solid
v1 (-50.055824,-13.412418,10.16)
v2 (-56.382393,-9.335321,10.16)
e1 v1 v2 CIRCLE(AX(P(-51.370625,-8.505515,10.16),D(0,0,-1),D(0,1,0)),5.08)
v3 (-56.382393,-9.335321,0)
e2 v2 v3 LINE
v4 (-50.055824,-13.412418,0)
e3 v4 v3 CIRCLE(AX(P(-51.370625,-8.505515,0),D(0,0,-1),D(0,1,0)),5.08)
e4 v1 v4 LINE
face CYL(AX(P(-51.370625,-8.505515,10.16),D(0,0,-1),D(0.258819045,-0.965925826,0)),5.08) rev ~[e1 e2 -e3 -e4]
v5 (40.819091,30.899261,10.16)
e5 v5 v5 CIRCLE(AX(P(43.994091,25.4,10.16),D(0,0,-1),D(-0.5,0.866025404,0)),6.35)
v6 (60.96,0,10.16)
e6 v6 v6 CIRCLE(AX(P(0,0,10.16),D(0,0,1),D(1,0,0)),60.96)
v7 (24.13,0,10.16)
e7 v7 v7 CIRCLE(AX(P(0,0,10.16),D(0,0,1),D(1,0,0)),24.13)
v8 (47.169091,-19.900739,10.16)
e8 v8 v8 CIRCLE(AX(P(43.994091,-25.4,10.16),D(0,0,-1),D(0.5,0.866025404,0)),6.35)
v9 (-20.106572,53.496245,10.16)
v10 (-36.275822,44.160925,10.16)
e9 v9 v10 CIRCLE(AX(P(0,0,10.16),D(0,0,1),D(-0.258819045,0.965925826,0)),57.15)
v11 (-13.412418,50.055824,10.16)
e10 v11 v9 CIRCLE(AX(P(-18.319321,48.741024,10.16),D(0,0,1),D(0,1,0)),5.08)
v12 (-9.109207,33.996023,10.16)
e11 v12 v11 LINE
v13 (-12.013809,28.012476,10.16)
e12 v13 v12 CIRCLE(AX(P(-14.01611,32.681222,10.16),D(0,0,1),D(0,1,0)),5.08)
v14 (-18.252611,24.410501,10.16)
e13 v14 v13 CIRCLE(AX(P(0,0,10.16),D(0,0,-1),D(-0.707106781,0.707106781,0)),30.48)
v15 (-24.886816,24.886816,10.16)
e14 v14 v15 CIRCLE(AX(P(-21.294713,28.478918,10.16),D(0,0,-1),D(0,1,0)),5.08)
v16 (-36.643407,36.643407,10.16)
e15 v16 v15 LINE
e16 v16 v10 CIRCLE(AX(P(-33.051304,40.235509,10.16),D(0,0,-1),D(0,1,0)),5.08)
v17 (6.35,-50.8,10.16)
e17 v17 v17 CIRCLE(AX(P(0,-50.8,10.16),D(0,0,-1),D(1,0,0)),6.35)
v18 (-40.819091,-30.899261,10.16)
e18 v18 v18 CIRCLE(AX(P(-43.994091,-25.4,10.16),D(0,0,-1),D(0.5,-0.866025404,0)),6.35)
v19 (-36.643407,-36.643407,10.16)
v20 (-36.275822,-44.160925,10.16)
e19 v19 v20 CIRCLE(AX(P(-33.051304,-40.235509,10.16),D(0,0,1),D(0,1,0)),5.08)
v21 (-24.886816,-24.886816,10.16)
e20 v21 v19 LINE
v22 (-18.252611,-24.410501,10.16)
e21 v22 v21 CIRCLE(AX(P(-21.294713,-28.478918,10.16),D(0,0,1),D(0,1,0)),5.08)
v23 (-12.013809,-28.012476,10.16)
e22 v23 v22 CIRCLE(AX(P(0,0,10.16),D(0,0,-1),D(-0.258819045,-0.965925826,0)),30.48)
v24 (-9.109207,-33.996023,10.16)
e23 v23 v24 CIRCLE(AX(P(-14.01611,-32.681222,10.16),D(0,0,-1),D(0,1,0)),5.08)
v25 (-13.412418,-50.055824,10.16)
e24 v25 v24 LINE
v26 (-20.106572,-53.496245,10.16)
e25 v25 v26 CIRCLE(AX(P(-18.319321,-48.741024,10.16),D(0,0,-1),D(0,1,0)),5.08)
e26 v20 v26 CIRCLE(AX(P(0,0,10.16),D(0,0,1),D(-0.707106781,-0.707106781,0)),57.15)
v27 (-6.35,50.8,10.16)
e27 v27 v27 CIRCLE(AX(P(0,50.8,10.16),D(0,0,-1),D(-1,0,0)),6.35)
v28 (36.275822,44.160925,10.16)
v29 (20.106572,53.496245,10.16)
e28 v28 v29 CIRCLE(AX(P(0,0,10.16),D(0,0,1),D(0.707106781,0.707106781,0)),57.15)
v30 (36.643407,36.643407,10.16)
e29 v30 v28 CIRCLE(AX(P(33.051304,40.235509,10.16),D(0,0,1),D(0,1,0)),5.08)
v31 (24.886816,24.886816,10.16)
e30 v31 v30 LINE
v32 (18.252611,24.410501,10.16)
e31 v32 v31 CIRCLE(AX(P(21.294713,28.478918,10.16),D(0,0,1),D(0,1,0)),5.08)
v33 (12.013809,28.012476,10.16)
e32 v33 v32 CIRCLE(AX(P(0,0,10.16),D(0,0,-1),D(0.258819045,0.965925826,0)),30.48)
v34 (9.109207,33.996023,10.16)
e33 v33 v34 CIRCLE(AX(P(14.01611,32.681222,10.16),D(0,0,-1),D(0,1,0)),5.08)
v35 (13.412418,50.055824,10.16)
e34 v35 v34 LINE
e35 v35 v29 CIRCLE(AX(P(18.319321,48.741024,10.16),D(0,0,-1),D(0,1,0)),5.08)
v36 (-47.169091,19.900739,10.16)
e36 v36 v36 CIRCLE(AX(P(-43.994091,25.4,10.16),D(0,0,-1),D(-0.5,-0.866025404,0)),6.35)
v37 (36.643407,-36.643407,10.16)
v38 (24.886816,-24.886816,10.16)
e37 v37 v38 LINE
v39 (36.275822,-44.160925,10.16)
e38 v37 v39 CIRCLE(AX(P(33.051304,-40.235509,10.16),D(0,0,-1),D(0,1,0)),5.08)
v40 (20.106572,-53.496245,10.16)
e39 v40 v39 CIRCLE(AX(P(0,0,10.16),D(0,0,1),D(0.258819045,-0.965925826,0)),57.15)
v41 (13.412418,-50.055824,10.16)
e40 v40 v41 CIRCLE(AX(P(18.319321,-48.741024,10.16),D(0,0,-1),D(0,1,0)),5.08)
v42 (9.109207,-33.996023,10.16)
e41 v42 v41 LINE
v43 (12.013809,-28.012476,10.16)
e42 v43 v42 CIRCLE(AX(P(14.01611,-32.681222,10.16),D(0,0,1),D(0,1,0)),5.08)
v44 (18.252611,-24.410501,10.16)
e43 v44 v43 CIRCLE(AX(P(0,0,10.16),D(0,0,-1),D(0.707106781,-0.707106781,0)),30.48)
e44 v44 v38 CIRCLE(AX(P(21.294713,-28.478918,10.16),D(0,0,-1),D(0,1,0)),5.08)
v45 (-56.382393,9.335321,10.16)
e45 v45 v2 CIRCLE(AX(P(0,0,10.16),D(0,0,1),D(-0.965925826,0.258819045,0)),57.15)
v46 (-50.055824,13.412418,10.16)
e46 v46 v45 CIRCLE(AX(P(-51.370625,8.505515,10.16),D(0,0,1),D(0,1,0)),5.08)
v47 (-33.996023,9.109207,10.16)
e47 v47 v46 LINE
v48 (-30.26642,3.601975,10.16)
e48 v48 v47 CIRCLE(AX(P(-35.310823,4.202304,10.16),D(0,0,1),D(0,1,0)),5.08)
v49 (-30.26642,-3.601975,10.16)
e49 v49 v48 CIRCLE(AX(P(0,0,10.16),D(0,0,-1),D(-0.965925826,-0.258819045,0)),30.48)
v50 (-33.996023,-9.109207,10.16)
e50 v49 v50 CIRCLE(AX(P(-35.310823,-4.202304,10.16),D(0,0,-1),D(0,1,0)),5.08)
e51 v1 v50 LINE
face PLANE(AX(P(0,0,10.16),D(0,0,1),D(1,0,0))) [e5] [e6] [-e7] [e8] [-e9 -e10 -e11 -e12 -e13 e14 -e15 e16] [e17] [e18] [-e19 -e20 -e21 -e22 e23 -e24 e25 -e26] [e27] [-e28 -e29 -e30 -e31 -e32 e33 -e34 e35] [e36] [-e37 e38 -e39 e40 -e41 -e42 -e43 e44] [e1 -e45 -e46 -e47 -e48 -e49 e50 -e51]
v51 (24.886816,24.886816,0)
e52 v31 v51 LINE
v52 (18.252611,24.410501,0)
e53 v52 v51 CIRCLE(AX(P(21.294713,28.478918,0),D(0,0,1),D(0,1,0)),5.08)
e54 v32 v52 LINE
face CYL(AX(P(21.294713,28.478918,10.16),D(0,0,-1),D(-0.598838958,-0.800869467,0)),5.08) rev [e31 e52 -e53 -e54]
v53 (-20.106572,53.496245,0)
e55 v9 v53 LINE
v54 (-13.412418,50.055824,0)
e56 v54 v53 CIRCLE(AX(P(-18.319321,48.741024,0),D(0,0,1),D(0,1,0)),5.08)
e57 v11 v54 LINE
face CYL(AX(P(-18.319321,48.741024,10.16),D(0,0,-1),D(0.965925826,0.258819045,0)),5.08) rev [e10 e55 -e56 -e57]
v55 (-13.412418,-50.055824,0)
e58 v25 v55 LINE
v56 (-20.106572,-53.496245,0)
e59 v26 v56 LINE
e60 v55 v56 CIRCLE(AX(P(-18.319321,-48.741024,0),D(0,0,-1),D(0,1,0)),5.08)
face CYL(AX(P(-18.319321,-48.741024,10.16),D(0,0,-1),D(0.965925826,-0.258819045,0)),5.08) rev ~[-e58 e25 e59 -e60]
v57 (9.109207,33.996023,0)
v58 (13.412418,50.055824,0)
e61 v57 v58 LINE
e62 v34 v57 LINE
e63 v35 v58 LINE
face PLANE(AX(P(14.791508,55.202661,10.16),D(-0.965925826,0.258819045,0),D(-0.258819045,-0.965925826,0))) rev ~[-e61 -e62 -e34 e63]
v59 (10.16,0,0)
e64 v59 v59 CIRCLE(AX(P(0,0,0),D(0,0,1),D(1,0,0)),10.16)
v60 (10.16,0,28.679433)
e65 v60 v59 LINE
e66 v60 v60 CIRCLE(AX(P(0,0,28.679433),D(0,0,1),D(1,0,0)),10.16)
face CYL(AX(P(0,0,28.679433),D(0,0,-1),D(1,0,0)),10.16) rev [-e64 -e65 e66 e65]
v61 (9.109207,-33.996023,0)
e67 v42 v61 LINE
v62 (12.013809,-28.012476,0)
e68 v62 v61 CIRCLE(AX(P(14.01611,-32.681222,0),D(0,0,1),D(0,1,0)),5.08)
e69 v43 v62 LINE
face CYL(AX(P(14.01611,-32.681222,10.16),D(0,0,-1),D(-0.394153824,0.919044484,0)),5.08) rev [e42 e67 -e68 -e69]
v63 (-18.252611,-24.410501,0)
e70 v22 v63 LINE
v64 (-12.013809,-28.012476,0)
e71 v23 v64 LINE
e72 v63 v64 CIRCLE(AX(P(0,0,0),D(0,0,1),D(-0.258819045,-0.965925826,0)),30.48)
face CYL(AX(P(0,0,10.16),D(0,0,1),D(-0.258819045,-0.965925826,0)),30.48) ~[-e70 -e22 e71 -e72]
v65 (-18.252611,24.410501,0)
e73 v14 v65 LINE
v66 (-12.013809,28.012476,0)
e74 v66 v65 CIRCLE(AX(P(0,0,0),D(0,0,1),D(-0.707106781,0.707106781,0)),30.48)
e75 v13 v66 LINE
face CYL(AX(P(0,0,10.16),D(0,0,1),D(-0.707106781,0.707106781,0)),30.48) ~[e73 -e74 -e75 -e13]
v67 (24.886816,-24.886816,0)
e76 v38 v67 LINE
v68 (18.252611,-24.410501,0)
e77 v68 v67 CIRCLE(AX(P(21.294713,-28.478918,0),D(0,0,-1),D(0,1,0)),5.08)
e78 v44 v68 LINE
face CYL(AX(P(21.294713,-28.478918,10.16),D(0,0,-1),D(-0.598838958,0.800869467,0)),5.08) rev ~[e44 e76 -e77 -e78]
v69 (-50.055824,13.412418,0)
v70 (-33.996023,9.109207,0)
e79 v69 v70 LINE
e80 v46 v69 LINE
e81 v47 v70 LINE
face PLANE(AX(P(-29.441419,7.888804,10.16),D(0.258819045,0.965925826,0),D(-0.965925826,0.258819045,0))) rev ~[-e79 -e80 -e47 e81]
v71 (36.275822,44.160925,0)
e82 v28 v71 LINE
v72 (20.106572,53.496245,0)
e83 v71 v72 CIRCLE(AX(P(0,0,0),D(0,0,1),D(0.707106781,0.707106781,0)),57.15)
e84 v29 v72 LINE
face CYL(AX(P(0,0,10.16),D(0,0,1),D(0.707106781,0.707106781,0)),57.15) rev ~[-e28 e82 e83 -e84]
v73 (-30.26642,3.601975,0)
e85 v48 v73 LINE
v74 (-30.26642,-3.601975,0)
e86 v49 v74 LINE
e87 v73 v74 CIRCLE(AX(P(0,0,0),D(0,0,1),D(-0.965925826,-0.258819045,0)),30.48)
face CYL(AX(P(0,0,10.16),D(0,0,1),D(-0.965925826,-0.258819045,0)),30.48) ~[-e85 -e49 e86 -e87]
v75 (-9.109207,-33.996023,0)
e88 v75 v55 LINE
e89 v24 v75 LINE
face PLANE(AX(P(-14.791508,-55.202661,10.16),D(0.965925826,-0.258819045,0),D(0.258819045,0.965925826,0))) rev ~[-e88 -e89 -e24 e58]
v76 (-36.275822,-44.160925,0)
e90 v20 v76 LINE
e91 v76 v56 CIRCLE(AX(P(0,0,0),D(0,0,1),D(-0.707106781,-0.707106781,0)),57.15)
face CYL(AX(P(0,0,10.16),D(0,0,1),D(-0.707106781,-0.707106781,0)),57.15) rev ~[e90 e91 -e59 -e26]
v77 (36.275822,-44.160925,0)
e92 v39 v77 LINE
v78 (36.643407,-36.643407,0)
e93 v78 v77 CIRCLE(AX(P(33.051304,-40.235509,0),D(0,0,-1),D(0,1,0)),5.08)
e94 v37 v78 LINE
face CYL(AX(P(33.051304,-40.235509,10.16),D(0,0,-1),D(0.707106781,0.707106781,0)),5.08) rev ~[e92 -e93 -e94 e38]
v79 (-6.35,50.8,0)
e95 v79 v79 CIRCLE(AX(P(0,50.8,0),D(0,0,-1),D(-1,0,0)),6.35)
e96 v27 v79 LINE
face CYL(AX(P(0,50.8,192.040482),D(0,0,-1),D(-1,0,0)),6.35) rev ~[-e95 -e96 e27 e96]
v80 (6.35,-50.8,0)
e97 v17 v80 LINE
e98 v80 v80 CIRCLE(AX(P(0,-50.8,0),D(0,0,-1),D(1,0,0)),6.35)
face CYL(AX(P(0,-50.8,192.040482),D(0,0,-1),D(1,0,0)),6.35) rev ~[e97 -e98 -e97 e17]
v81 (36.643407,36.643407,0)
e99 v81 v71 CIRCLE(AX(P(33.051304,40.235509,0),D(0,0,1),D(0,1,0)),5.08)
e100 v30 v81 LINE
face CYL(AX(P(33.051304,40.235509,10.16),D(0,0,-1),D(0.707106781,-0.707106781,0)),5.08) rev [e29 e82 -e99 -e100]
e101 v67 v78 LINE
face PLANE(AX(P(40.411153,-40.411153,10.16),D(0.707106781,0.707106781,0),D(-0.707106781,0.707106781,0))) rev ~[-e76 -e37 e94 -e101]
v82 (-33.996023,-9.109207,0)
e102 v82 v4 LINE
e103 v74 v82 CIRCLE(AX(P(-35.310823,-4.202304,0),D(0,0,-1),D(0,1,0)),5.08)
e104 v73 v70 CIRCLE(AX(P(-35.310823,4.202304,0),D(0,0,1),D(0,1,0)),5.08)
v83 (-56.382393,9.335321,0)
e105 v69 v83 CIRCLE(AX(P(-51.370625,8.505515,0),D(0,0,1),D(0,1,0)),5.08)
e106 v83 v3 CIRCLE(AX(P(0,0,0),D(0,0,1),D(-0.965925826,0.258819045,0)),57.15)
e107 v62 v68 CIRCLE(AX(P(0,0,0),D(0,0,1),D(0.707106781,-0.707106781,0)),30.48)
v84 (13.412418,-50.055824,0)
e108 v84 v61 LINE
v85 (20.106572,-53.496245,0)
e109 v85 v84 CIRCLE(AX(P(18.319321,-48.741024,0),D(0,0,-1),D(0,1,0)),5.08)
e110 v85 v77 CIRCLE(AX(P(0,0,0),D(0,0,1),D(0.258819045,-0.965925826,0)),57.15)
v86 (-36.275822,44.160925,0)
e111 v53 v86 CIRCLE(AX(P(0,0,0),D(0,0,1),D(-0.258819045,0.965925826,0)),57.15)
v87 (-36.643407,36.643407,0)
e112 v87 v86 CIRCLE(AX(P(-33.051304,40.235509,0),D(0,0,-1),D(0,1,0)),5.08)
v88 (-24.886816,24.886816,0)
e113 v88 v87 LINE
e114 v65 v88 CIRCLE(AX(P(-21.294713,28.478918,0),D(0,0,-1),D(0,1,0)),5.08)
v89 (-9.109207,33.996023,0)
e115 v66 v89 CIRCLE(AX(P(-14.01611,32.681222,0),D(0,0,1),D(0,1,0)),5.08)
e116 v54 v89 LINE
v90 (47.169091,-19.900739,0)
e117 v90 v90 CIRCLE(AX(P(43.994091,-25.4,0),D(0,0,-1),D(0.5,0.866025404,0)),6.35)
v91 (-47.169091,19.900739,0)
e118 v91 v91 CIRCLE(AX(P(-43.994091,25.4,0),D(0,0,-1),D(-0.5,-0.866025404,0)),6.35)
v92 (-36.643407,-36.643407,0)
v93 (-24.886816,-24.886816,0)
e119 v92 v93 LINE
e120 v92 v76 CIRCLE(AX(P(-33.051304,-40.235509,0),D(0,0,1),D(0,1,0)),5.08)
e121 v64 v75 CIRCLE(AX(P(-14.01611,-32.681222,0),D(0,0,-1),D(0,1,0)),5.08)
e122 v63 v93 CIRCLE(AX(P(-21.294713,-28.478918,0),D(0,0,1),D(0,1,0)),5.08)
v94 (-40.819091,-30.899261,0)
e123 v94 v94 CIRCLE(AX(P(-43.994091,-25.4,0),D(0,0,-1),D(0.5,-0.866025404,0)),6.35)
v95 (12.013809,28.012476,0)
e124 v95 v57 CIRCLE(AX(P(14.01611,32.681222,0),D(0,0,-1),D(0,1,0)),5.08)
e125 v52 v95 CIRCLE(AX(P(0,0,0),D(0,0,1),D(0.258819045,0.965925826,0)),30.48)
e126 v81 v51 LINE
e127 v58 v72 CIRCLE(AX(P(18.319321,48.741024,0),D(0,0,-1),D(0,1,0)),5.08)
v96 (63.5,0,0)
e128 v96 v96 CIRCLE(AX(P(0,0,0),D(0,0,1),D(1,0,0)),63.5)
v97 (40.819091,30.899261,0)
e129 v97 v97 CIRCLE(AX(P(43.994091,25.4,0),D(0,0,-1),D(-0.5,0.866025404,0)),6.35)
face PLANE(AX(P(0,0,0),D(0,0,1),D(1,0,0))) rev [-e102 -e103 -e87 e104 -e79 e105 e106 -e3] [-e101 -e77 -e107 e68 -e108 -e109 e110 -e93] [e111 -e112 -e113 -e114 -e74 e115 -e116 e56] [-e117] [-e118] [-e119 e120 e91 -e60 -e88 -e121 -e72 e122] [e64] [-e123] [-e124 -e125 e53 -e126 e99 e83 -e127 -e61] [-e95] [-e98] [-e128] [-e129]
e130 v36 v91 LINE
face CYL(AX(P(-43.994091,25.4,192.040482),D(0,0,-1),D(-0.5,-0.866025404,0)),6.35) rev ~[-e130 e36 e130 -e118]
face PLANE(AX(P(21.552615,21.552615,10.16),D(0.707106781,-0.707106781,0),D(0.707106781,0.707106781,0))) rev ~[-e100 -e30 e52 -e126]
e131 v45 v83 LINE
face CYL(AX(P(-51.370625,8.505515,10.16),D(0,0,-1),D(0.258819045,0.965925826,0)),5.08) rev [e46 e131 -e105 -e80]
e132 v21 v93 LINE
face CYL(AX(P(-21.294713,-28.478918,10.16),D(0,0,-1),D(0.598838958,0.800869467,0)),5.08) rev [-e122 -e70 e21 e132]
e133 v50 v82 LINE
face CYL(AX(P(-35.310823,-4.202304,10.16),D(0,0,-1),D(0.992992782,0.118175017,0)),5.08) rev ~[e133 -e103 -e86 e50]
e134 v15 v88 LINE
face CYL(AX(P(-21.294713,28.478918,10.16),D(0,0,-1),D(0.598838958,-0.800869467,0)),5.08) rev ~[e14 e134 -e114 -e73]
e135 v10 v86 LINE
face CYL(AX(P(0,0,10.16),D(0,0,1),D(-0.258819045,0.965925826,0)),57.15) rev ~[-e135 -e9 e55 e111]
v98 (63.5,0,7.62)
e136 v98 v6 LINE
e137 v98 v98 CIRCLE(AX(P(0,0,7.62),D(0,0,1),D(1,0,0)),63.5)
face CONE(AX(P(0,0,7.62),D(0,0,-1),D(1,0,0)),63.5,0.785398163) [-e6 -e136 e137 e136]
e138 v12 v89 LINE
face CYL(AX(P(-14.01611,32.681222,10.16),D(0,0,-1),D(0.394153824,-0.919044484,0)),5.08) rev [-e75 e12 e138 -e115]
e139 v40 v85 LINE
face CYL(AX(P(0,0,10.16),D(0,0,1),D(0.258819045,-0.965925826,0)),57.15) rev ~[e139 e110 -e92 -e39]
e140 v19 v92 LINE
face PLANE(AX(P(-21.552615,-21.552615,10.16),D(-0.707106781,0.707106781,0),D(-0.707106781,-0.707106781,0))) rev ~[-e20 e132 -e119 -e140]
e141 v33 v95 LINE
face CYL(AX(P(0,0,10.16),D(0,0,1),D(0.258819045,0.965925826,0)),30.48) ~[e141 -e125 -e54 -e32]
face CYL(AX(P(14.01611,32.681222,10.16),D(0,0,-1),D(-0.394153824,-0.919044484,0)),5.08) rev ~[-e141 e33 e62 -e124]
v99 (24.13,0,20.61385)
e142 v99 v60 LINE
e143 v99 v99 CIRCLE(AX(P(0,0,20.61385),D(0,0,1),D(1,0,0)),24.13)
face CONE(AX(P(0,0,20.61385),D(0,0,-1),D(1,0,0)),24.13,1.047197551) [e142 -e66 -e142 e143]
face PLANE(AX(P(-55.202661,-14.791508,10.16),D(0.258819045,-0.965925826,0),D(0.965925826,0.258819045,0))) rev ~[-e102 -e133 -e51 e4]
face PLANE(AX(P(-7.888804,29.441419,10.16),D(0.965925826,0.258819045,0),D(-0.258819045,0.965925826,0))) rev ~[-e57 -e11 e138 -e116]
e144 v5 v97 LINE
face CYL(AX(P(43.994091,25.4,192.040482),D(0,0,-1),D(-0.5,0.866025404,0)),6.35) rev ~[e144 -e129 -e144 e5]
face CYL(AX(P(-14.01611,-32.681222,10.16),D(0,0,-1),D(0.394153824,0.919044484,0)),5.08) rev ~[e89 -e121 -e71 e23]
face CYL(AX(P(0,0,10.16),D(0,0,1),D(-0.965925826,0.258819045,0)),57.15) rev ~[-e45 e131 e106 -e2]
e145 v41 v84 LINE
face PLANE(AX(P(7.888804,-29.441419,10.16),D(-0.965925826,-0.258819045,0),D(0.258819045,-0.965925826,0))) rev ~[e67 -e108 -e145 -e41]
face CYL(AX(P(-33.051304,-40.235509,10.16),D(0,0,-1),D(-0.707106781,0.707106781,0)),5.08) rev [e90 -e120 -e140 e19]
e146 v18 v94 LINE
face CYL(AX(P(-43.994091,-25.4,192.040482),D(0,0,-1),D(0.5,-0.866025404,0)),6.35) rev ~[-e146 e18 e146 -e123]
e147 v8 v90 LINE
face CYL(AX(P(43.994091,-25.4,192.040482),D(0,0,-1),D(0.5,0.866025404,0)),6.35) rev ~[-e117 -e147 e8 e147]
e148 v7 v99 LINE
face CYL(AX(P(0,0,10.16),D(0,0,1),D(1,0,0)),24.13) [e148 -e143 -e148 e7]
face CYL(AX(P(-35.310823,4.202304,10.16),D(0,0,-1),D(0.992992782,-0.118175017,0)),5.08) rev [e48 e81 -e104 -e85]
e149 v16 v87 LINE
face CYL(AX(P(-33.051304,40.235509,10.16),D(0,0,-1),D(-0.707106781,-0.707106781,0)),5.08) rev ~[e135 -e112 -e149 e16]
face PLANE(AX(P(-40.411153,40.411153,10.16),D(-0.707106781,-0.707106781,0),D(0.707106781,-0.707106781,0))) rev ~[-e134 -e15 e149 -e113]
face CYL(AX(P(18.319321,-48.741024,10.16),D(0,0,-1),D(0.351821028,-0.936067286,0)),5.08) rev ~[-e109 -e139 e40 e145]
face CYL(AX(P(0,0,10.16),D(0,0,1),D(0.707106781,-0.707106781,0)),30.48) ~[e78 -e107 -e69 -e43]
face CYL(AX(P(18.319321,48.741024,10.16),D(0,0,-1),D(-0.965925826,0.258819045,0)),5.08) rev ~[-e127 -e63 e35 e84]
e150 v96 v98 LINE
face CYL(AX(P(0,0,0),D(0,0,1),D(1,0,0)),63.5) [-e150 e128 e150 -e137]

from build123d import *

# Parameters (mm, degrees)
F3_D            = 12.7
F3_COPIES_COUNT = 6
F5_DEPTH        = 10.161
F5_COPIES_COUNT = 5
F5_COPIES_ANGLE = 240
F6_R            = 5.08
F7_SIZE         = 2.54


# Not quite as in the source:
# - a pattern or mirror of a feature is missing from the dataset's text; its kind, count and spacing are read off the source's solid


with BuildPart() as f1:
    # F0 (on Front) → F1 (revolve)
    with BuildSketch(Plane.XZ):
        Polygon((10.16, 0), (63.5, 0), (63.5, 10.16), (24.13, 10.16), (24.13, 20.6138496578), (10.16, 28.6794329184), align=None)
    revolve(axis=Axis((0, 0, 9.6584064886), (0, 0, 1)))

    # F3 (through all)
    with Locations(Plane.XY.offset(10.16)):
        with Locations((0, 50.8)):
            f3 = Hole(F3_D / 2)

    # F3_copies: F3 ×6 about axis
    f3_copies_axis = Axis((0, 0, 0), (0, 0, 1))
    for i in range(1, F3_COPIES_COUNT):
        add(f3.rotate(f3_copies_axis, i * 360 / F3_COPIES_COUNT), mode=Mode.SUBTRACT)

    # F4 (on face) → F5 (cut, through all)
    with BuildSketch(Plane.XY.offset(10.16)):
        with BuildLine():
            ThreePointArc((7.8888044947, 29.4414191853), (15.24, 26.3964543073), (21.5526146906, 21.5526146906))
            Line((21.5526146906, 21.5526146906), (40.4111525448, 40.4111525448))
            ThreePointArc((40.4111525448, 40.4111525448), (28.575, 49.4933518263), (14.7915084276, 55.2026609724))
            Line((14.7915084276, 55.2026609724), (7.8888044947, 29.4414191853))
        make_face()
    f5 = extrude(amount=-F5_DEPTH, mode=Mode.SUBTRACT)

    # F5_copies: F5 ×5 about axis
    f5_copies_axis = Axis((0, 0, 0), (0, 0, 1))
    for i in range(1, F5_COPIES_COUNT):
        add(f5.rotate(f5_copies_axis, i * F5_COPIES_ANGLE / (F5_COPIES_COUNT - 1)), mode=Mode.SUBTRACT)

    # F6
    f6_edges = [f1.edges().sort_by_distance(p)[0] for p in [
        (14.791508, 55.202661, 5.08),
        (7.888804, 29.441419, 5.08),
        (21.552615, 21.552615, 5.08),
        (40.411153, 40.411153, 5.08),
        (14.791508, -55.202661, 5.08),
        (7.888804, -29.441419, 5.08),
        (21.552615, -21.552615, 5.08),
        (40.411153, -40.411153, 5.08),
        (-40.411153, -40.411153, 5.08),
        (-21.552615, -21.552615, 5.08),
        (-14.791508, -55.202661, 5.08),
        (-7.888804, -29.441419, 5.08),
        (-55.202661, 14.791508, 5.08),
        (-29.441419, 7.888804, 5.08),
        (-55.202661, -14.791508, 5.08),
        (-29.441419, -7.888804, 5.08),
        (-14.791508, 55.202661, 5.08),
        (-7.888804, 29.441419, 5.08),
        (-40.411153, 40.411153, 5.08),
        (-21.552615, 21.552615, 5.08),
    ]]
    fillet(f6_edges, radius=F6_R)

    # F7
    f7_edges = [f1.edges().sort_by_distance(p)[0] for p in [
        (-63.5, 0, 10.16),
    ]]
    chamfer(f7_edges, length=F7_SIZE)


solid = f1.part
